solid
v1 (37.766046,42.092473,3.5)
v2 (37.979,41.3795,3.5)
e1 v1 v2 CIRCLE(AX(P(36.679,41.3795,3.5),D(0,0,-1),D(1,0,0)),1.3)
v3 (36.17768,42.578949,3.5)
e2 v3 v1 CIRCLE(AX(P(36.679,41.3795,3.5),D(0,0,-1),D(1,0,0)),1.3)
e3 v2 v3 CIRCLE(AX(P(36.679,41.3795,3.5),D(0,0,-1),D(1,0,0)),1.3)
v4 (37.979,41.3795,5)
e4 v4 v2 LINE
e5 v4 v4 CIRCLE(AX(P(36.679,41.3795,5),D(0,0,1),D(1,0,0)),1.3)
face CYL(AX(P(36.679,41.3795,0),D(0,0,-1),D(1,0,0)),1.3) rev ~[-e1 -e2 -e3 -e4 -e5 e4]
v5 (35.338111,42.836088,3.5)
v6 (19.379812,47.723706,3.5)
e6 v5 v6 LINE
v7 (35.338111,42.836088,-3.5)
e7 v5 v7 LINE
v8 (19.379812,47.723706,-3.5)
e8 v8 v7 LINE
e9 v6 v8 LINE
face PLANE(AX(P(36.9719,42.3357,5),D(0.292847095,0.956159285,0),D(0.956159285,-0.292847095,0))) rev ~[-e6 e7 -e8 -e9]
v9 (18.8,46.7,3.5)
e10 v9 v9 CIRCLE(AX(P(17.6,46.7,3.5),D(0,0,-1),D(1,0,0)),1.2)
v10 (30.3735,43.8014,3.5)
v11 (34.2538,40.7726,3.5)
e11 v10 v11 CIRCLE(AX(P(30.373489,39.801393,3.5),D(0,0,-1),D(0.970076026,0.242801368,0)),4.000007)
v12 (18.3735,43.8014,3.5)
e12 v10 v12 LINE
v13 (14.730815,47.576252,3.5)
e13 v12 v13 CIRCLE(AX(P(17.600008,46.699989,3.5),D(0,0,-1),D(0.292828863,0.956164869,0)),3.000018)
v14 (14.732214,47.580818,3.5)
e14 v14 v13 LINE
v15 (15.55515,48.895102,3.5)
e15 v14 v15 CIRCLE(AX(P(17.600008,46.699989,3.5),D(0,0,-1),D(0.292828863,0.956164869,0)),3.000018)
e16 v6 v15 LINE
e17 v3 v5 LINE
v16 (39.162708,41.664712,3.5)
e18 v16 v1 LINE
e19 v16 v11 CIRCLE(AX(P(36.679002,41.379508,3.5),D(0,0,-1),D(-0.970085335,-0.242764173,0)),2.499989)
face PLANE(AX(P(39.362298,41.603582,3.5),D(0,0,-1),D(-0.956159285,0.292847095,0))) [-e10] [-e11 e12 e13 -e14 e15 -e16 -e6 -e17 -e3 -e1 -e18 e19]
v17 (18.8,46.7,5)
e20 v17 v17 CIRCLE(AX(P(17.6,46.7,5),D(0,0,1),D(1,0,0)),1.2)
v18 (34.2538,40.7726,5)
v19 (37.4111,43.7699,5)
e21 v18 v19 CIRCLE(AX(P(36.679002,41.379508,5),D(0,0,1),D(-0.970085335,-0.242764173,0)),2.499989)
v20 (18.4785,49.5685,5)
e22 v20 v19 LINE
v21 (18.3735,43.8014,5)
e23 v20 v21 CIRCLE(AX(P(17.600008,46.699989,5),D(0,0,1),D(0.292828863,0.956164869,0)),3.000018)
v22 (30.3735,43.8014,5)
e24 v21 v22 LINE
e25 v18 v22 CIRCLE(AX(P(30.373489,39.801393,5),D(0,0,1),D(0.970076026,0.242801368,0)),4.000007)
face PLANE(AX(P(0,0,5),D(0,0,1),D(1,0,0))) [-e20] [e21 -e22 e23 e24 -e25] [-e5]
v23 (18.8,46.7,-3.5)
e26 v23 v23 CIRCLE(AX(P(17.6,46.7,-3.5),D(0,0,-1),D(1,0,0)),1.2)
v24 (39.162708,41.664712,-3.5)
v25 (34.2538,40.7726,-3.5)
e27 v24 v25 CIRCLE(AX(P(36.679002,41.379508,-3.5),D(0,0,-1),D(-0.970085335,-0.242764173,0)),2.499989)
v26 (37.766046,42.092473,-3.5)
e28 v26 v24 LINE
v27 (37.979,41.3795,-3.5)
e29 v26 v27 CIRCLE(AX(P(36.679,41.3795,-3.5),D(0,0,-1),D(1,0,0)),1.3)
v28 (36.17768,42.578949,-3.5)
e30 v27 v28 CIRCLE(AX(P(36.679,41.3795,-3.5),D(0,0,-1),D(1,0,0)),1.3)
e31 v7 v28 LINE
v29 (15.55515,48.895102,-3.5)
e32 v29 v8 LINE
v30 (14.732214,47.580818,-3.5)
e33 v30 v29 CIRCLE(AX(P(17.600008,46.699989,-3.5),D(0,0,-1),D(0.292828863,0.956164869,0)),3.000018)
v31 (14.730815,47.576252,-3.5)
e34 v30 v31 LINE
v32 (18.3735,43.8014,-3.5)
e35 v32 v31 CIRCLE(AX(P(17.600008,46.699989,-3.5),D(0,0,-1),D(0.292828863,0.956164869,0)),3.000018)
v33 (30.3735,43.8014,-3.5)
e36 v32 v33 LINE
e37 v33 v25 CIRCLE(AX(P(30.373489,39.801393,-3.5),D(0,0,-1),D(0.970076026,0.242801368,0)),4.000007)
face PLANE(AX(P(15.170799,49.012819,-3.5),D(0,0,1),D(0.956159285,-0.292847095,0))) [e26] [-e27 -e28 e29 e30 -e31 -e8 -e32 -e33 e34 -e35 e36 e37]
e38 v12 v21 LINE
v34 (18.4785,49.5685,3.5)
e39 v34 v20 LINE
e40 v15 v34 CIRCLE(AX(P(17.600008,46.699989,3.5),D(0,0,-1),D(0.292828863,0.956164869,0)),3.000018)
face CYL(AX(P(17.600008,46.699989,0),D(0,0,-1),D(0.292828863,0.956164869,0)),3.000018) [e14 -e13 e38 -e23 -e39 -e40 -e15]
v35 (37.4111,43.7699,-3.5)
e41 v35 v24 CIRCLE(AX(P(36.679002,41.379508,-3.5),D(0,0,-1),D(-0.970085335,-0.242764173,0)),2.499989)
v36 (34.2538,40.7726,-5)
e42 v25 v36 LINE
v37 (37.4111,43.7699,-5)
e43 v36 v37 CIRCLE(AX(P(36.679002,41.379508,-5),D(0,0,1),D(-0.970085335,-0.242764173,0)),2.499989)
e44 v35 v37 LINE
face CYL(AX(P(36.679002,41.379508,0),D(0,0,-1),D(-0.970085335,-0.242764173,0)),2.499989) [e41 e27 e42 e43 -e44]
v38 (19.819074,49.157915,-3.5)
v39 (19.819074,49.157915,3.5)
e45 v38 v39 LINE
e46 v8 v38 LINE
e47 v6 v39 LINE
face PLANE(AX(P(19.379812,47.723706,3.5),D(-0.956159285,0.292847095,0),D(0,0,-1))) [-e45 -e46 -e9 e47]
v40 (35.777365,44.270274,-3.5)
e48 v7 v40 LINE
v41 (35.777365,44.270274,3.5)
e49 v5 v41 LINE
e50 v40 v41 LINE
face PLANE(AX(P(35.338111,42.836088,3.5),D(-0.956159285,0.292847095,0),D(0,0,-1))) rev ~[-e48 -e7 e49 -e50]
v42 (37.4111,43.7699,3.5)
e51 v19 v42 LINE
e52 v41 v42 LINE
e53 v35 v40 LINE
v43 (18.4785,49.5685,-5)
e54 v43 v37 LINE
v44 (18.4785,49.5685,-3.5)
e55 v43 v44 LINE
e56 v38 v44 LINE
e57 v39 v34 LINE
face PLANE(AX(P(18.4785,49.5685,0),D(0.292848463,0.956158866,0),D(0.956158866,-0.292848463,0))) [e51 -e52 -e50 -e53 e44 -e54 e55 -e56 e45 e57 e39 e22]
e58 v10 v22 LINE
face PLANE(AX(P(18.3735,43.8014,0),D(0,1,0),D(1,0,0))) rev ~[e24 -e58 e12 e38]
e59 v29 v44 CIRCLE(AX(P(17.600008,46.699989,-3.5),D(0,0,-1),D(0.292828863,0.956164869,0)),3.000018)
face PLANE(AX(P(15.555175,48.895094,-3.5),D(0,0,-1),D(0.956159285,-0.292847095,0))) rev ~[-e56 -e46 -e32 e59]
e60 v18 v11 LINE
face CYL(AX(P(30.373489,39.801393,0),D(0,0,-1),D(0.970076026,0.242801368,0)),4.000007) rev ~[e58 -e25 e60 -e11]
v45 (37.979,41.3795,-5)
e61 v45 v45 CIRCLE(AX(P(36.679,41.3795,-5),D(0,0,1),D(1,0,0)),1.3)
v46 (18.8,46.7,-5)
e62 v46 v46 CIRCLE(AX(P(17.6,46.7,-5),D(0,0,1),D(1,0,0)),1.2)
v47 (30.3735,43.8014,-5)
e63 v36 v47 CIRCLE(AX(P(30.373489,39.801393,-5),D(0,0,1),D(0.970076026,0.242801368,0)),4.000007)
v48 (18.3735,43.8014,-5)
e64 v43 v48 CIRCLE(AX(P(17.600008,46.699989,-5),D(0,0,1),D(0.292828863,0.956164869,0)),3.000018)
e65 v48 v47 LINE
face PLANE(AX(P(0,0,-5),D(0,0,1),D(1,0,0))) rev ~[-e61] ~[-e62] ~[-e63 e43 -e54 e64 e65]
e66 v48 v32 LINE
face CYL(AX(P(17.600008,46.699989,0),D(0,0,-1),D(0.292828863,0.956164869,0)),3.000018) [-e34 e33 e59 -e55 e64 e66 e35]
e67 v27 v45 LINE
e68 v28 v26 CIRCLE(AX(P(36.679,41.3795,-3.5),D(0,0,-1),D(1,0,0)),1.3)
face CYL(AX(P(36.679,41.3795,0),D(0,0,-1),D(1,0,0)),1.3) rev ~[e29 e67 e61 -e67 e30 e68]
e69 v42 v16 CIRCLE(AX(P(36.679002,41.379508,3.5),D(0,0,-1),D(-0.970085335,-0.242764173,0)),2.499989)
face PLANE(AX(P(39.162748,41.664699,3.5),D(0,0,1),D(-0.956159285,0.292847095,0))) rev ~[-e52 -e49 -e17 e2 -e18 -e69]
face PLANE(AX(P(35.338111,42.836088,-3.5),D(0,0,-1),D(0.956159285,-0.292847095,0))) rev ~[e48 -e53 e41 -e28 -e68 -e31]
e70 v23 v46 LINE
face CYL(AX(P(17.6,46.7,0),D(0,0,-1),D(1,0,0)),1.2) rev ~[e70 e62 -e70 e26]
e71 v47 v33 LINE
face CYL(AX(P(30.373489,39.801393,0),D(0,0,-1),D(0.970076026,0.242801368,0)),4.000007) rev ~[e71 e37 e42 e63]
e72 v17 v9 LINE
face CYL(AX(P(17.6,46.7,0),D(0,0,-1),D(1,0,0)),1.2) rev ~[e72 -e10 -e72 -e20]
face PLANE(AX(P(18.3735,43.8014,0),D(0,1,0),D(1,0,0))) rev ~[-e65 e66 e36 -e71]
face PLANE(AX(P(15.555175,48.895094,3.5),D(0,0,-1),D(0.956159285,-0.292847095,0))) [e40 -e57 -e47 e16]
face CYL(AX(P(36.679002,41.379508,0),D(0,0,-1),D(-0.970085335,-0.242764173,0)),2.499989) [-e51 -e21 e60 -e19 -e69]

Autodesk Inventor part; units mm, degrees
ref_plane "YZ Plane" through (0, 0, 0) normal (1, 0, 0) x (0, 1, 0)
ref_plane "XZ Plane" through (0, 0, 0) normal (0, 1, 0) x (-1, 0, 0)
sketch "Sketch1" plane through (0, 0, 0) normal (0, 0, 1) x (1, 0, 0)
  circle A0 centre (17.6, 46.7) radius 1.2
  circle A1 centre (36.679, 41.3795) radius 1.3
  arc A2 (18.4785, 49.5685) -> (18.3735, 43.8014) centre (17.6, 46.7) ccw
  arc A3 (34.2538, 40.7726) -> (37.4111, 43.7699) centre (36.679, 41.3795) ccw
  line L0 (18.4785, 49.5685) -> (37.4111, 43.7699)
  line L1 (18.3735, 43.8014) -> (30.3735, 43.8014)
  arc A4 (34.2538, 40.7726) -> (30.3735, 43.8014) centre (30.3735, 39.8014) ccw
  circle A5 centre (36.679, 41.3795) radius 1.2
  point P0 (0, 0)
  dimension "d0" = 5
  dimension "d1" = 3
  dimension "d3" = 4
  dimension "d14" = 12
  dimension "d15" = 2.6
extrude "Extrusion1" add sketch "Sketch1" along normal mid plane 10 contours L0 A3 A4 L1 A2
ref_plane "Work Plane1" through (36.9719, 42.3357, 5) normal (0.2928471, 0.9561593, 0) x (0.9561593, -0.2928471, 0)
sketch "Sketch2" plane through (36.9719, 42.3357, 5) normal (0.2928471, 0.9561593, 0) x (0.9561593, -0.2928471, 0)
  line L0 (8.6668, 5) -> (-28.9168, 5) projected
  line L1 (-22.8007, 8.5) -> (2.5, 8.5)
  line L2 (2.5, 8.5) -> (2.5, 1.5)
  line L3 (2.5, 1.5) -> (-22.8007, 1.5)
  line L4 (-22.8007, 1.5) -> (-22.8007, 8.5)
  line L5 (2.5, 10) -> (2.5, 0) projected
  line L6 (-22.8007, 10) -> (-22.8007, 0) projected
  point P0 (-22.9531, 5)
  dimension "d7" = 7
extrude "Extrusion2" cut sketch "Sketch2" against normal through all
sketch "Sketch3" plane through (36.9719, 42.3357, 5) normal (-0.2928471, -0.9561593, 0) x (0.9561593, -0.2928471, 0)
  line L0 (-22.3987, -8.5) -> (-22.3987, -1.5) projected
  line L1 (-22.3987, -8.5) -> (2.2913, -8.5) projected
  line L2 (2.2913, -1.5) -> (2.2913, -8.5) projected
  line L3 (-22.3987, -1.5) -> (-18.3987, -1.5)
  line L4 (-18.3987, -1.5) -> (-18.3987, -8.5)
  line L5 (-18.3987, -8.5) -> (-22.3987, -8.5)
  line L6 (-22.3987, -8.5) -> (-22.3987, -1.5)
  line L7 (2.2913, -1.5) -> (-1.7087, -1.5)
  line L8 (-1.7087, -1.5) -> (-1.7087, -8.5)
  line L9 (-1.7087, -8.5) -> (2.2913, -8.5)
  line L10 (2.2913, -8.5) -> (2.2913, -1.5)
  point P0 (-22.9531, -5)
  dimension "d10" = 4
  dimension "d11" = 4
extrude "Extrusion3" cut sketch "Sketch3" against normal through all
properties part number "Lever for half overlay hinge" material "Steel"
